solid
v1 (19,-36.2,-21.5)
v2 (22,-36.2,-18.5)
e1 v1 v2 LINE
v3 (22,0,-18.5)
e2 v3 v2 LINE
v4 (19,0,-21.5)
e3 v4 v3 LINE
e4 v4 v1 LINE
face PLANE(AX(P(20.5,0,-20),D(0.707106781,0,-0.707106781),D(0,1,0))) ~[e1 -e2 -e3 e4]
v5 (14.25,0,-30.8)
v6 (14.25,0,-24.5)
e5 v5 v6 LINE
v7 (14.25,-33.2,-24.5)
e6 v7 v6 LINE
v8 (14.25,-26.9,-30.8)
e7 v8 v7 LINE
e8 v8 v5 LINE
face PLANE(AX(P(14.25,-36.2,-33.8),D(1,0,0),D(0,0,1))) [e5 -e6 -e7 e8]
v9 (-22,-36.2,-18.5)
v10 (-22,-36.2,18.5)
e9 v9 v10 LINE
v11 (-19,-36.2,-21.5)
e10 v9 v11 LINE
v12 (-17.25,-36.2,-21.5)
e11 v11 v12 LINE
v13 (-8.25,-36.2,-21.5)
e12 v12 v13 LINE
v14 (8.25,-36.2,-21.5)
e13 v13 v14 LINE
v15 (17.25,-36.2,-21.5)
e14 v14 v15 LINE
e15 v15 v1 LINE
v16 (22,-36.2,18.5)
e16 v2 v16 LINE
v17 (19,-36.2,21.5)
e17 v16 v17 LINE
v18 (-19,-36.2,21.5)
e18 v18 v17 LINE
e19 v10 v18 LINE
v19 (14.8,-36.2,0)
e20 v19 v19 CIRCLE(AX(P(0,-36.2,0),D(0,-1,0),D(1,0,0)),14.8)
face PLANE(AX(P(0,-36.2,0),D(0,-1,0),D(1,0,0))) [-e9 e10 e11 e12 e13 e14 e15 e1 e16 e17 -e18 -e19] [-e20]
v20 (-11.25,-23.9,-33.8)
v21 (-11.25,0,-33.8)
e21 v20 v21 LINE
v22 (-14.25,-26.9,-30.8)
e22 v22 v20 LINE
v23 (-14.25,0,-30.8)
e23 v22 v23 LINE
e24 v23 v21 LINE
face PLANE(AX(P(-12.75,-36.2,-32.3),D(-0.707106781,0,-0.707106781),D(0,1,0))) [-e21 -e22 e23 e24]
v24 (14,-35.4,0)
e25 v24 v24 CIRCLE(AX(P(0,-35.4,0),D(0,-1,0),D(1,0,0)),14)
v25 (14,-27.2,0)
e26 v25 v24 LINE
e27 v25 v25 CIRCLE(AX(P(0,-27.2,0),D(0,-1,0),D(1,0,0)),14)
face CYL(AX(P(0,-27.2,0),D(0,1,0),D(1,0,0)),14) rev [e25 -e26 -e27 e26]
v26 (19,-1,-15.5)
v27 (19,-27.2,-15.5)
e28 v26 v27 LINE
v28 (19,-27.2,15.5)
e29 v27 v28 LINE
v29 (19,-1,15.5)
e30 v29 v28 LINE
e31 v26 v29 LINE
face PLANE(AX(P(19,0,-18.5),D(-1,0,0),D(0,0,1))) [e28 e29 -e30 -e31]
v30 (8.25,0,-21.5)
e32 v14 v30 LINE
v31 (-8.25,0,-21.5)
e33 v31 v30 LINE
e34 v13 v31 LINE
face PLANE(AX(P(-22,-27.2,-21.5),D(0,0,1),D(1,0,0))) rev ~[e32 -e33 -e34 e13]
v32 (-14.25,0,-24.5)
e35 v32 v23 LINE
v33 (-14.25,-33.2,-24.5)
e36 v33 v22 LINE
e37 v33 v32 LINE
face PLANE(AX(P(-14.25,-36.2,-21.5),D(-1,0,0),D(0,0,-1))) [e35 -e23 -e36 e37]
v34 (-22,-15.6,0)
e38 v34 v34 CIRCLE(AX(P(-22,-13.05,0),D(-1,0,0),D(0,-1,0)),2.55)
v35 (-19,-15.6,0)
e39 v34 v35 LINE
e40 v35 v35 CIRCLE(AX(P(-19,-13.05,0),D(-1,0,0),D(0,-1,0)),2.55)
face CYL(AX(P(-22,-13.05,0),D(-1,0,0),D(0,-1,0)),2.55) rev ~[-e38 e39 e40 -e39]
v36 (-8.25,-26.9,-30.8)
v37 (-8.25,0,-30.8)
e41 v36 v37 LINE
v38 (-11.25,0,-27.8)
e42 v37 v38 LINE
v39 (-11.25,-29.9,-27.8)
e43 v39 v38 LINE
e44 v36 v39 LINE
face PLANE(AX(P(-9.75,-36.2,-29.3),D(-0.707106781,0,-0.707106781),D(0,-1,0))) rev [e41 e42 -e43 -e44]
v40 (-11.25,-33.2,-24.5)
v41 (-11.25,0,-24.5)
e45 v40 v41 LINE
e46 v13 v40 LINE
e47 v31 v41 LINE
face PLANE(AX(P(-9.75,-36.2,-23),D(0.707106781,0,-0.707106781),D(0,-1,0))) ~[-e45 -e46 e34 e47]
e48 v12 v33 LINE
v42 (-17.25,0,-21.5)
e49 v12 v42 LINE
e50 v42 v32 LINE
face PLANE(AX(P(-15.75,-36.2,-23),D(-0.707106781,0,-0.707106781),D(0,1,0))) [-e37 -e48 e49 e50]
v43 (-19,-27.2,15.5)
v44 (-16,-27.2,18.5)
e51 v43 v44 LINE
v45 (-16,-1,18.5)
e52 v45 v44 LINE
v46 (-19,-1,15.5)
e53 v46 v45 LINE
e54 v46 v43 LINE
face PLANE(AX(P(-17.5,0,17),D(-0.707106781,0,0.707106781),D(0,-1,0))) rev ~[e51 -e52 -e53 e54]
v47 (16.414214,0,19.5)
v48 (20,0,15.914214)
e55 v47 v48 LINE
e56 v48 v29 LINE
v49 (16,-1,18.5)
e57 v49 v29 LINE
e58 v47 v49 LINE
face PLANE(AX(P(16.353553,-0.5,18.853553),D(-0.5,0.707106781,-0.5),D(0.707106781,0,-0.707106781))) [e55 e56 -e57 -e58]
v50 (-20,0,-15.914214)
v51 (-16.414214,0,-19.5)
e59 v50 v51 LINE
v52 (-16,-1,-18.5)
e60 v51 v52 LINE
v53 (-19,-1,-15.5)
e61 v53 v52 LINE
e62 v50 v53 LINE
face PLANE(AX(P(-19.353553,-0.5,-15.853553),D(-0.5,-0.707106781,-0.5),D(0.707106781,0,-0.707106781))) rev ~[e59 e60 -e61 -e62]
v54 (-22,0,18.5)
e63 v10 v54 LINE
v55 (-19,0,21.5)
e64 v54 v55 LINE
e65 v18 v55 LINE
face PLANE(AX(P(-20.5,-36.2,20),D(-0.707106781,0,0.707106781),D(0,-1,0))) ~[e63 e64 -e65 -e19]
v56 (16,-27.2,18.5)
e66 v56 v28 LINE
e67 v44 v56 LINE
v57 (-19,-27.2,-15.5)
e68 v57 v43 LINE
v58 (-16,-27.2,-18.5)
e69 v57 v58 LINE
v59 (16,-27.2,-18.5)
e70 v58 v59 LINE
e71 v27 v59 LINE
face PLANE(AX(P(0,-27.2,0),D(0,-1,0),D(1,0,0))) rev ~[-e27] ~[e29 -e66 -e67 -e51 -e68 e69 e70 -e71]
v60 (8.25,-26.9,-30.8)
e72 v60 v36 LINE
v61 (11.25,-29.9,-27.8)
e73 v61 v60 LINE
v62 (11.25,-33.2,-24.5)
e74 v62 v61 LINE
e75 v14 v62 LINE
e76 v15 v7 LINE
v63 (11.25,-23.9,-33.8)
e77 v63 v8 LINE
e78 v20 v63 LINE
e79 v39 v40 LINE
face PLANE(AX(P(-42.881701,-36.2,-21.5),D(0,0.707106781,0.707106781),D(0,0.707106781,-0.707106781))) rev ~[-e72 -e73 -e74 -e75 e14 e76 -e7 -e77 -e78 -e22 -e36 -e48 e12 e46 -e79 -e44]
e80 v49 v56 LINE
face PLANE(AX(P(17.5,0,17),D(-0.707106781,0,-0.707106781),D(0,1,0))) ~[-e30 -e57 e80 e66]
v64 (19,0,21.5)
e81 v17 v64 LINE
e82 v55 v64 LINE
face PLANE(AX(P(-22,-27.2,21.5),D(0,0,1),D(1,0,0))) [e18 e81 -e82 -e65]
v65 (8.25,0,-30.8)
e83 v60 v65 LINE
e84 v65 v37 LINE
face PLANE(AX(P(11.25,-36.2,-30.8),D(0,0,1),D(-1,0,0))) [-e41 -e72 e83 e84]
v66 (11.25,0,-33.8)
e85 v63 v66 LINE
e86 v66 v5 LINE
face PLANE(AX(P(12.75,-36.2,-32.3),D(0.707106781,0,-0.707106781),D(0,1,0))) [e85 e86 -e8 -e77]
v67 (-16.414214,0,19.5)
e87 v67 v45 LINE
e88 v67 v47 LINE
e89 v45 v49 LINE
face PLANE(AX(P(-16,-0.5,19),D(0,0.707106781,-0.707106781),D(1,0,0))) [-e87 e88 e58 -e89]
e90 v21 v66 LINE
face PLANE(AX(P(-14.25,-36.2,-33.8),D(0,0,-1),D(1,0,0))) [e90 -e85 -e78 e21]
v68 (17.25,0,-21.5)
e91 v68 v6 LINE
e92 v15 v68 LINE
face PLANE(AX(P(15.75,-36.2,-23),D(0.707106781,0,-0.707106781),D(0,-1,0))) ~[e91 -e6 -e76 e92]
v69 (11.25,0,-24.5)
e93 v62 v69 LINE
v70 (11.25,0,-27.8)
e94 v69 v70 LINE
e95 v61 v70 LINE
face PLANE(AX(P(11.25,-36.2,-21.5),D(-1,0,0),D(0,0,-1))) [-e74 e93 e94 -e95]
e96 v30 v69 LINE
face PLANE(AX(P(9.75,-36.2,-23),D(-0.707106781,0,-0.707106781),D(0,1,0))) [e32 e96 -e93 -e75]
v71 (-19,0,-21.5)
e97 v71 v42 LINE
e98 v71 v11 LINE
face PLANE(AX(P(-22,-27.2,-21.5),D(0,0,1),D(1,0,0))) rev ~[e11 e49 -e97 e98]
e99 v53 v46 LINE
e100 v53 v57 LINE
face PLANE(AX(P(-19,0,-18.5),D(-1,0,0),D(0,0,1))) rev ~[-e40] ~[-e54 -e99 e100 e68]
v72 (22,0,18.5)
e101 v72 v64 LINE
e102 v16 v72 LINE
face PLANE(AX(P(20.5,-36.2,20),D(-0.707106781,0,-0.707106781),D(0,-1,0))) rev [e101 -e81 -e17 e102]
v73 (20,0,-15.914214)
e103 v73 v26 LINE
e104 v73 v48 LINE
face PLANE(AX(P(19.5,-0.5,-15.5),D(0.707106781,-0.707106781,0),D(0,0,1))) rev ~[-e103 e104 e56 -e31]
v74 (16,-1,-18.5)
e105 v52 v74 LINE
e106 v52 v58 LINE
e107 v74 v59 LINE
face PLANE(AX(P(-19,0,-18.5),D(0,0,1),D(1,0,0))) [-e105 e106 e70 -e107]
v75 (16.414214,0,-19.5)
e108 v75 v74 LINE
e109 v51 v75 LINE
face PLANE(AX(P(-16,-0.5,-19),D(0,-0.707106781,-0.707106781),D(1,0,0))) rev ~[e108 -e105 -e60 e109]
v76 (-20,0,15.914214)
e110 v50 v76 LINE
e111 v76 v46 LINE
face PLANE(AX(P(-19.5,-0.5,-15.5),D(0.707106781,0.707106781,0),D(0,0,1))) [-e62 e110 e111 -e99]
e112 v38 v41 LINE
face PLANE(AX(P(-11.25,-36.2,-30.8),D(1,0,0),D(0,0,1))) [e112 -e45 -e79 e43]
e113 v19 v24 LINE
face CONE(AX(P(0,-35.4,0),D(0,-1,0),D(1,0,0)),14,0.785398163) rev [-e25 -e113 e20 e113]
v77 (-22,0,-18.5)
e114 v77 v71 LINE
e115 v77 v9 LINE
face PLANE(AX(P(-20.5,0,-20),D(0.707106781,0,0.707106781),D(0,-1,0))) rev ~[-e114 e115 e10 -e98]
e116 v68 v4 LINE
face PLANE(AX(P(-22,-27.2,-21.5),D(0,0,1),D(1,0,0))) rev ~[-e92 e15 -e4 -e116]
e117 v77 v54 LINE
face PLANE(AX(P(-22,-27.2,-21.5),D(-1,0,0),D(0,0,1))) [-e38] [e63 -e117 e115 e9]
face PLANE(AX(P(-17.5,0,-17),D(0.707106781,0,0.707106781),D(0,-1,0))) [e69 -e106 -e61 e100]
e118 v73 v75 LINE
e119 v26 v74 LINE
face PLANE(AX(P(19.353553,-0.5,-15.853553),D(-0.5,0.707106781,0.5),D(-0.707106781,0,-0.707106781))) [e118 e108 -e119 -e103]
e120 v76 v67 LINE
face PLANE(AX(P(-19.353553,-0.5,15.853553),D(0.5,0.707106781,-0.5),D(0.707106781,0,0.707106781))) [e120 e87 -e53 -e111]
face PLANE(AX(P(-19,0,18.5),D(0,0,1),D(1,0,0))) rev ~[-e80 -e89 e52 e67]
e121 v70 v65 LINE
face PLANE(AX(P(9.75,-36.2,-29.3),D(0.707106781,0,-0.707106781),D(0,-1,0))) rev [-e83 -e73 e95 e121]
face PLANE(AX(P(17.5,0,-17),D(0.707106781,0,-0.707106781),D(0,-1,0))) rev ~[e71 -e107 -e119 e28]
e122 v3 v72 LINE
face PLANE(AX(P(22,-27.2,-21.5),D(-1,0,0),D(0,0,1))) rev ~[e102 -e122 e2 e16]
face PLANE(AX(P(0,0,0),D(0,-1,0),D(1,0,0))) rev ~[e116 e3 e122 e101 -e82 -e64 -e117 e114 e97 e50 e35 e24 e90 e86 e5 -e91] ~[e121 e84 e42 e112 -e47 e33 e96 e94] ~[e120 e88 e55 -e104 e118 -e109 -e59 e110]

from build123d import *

# Parameters (mm, degrees)
F0_W        = 44
F0_H        = 43
F0_W_2      = 38
F0_H_2      = 37
F1_DEPTH    = 27.2
F2_W        = 44
F2_H        = 43
F2_R        = 14
F3_DEPTH    = 9
F4_SIZE     = 3
F6_DEPTH    = 36.2
F7_SIZE     = 3
F8_T1_DEPTH = 85.763401504
F9_R        = 2.55
F10_DEPTH   = 3
F11_SIZE    = 0.8
F12_SIZE    = 1


# Not quite as in the source:
# - a fillet or chamfer that OpenCascade refuses, or shapes differently, is made with other operations: its cross-section is extruded or revolved along the edge and cut away or added


with BuildPart() as f1:
    # F0 (on Front) → F1 (new body)
    with BuildSketch(Plane.XZ):
        Rectangle(F0_W, F0_H)
        Rectangle(F0_W_2, F0_H_2, mode=Mode.SUBTRACT)
    extrude(amount=F1_DEPTH)

    # F2 (on face) → F3 (join)
    with BuildSketch(Plane.XZ.offset(27.2)):
        Rectangle(F2_W, F2_H)
        Circle(F2_R, mode=Mode.SUBTRACT)
    extrude(amount=F3_DEPTH)

    # F4
    f4_edges = [f1.edges().sort_by_distance(p)[0] for p in [
        (22, -18.1, 21.5),
        (22, -18.1, -21.5),
        (-22, -18.1, -21.5),
        (-22, -18.1, 21.5),
        (-19, -13.6, 18.5),
        (-19, -13.6, -18.5),
        (19, -13.6, -18.5),
        (19, -13.6, 18.5),
    ]]
    chamfer(f4_edges, length=F4_SIZE)

    # F5 (on face) → F6 (join, through all)
    with BuildSketch(Plane.XZ.offset(36.2)):
        Polygon((-14.25, -33.8), (14.25, -33.8), (14.25, -21.5), (11.25, -21.5), (11.25, -30.8), (-11.25, -30.8), (-11.25, -21.5), (-14.25, -21.5), align=None)
    extrude(amount=-F6_DEPTH)

    # F7
    f7_edges = [f1.edges().sort_by_distance(p)[0] for p in [
        (-14.25, -18.1, -33.8),
        (-14.25, -18.1, -21.5),
        (-11.25, -18.1, -30.8),
        (11.25, -18.1, -30.8),
        (11.25, -18.1, -21.5),
        (14.25, -18.1, -33.8),
        (14.25, -18.1, -21.5),
        (-11.25, -18.1, -21.5),
    ]]
    chamfer(f7_edges, length=F7_SIZE)

    # F8: chamfer of 12.3 on 1 edges, made by hand

    # F8_s2 → F8_t1 (cut)
    with BuildSketch(Plane.YZ.offset(-42.881700752)):
        Polygon((-36.2, -21.5), (-23.9, -33.8), (-36.2, -33.8), align=None)
    extrude(amount=F8_T1_DEPTH, mode=Mode.SUBTRACT)

    # F9 (on face) → F10 (cut, through all)
    with BuildSketch(Plane(origin=(-22, 0, 0), x_dir=(0, -1, 0), z_dir=(-1, 0, 0))):
        with Locations((13.05, 0)):
            Circle(F9_R)
    extrude(amount=-F10_DEPTH, mode=Mode.SUBTRACT)

    # F11
    f11_edges = [f1.edges().sort_by_distance(p)[0] for p in [
        (-14, -36.2, 0),
    ]]
    chamfer(f11_edges, length=F11_SIZE)

    # F12
    f12_edges = [f1.edges().sort_by_distance(p)[0] for p in [
        (0, 0, 18.5),
        (19, 0, 0),
        (0, 0, -18.5),
        (-19, 0, 0),
        (17.5, 0, 17),
        (17.5, 0, -17),
        (-17.5, 0, -17),
        (-17.5, 0, 17),
    ]]
    chamfer(f12_edges, length=F12_SIZE)


solid = f1.part
